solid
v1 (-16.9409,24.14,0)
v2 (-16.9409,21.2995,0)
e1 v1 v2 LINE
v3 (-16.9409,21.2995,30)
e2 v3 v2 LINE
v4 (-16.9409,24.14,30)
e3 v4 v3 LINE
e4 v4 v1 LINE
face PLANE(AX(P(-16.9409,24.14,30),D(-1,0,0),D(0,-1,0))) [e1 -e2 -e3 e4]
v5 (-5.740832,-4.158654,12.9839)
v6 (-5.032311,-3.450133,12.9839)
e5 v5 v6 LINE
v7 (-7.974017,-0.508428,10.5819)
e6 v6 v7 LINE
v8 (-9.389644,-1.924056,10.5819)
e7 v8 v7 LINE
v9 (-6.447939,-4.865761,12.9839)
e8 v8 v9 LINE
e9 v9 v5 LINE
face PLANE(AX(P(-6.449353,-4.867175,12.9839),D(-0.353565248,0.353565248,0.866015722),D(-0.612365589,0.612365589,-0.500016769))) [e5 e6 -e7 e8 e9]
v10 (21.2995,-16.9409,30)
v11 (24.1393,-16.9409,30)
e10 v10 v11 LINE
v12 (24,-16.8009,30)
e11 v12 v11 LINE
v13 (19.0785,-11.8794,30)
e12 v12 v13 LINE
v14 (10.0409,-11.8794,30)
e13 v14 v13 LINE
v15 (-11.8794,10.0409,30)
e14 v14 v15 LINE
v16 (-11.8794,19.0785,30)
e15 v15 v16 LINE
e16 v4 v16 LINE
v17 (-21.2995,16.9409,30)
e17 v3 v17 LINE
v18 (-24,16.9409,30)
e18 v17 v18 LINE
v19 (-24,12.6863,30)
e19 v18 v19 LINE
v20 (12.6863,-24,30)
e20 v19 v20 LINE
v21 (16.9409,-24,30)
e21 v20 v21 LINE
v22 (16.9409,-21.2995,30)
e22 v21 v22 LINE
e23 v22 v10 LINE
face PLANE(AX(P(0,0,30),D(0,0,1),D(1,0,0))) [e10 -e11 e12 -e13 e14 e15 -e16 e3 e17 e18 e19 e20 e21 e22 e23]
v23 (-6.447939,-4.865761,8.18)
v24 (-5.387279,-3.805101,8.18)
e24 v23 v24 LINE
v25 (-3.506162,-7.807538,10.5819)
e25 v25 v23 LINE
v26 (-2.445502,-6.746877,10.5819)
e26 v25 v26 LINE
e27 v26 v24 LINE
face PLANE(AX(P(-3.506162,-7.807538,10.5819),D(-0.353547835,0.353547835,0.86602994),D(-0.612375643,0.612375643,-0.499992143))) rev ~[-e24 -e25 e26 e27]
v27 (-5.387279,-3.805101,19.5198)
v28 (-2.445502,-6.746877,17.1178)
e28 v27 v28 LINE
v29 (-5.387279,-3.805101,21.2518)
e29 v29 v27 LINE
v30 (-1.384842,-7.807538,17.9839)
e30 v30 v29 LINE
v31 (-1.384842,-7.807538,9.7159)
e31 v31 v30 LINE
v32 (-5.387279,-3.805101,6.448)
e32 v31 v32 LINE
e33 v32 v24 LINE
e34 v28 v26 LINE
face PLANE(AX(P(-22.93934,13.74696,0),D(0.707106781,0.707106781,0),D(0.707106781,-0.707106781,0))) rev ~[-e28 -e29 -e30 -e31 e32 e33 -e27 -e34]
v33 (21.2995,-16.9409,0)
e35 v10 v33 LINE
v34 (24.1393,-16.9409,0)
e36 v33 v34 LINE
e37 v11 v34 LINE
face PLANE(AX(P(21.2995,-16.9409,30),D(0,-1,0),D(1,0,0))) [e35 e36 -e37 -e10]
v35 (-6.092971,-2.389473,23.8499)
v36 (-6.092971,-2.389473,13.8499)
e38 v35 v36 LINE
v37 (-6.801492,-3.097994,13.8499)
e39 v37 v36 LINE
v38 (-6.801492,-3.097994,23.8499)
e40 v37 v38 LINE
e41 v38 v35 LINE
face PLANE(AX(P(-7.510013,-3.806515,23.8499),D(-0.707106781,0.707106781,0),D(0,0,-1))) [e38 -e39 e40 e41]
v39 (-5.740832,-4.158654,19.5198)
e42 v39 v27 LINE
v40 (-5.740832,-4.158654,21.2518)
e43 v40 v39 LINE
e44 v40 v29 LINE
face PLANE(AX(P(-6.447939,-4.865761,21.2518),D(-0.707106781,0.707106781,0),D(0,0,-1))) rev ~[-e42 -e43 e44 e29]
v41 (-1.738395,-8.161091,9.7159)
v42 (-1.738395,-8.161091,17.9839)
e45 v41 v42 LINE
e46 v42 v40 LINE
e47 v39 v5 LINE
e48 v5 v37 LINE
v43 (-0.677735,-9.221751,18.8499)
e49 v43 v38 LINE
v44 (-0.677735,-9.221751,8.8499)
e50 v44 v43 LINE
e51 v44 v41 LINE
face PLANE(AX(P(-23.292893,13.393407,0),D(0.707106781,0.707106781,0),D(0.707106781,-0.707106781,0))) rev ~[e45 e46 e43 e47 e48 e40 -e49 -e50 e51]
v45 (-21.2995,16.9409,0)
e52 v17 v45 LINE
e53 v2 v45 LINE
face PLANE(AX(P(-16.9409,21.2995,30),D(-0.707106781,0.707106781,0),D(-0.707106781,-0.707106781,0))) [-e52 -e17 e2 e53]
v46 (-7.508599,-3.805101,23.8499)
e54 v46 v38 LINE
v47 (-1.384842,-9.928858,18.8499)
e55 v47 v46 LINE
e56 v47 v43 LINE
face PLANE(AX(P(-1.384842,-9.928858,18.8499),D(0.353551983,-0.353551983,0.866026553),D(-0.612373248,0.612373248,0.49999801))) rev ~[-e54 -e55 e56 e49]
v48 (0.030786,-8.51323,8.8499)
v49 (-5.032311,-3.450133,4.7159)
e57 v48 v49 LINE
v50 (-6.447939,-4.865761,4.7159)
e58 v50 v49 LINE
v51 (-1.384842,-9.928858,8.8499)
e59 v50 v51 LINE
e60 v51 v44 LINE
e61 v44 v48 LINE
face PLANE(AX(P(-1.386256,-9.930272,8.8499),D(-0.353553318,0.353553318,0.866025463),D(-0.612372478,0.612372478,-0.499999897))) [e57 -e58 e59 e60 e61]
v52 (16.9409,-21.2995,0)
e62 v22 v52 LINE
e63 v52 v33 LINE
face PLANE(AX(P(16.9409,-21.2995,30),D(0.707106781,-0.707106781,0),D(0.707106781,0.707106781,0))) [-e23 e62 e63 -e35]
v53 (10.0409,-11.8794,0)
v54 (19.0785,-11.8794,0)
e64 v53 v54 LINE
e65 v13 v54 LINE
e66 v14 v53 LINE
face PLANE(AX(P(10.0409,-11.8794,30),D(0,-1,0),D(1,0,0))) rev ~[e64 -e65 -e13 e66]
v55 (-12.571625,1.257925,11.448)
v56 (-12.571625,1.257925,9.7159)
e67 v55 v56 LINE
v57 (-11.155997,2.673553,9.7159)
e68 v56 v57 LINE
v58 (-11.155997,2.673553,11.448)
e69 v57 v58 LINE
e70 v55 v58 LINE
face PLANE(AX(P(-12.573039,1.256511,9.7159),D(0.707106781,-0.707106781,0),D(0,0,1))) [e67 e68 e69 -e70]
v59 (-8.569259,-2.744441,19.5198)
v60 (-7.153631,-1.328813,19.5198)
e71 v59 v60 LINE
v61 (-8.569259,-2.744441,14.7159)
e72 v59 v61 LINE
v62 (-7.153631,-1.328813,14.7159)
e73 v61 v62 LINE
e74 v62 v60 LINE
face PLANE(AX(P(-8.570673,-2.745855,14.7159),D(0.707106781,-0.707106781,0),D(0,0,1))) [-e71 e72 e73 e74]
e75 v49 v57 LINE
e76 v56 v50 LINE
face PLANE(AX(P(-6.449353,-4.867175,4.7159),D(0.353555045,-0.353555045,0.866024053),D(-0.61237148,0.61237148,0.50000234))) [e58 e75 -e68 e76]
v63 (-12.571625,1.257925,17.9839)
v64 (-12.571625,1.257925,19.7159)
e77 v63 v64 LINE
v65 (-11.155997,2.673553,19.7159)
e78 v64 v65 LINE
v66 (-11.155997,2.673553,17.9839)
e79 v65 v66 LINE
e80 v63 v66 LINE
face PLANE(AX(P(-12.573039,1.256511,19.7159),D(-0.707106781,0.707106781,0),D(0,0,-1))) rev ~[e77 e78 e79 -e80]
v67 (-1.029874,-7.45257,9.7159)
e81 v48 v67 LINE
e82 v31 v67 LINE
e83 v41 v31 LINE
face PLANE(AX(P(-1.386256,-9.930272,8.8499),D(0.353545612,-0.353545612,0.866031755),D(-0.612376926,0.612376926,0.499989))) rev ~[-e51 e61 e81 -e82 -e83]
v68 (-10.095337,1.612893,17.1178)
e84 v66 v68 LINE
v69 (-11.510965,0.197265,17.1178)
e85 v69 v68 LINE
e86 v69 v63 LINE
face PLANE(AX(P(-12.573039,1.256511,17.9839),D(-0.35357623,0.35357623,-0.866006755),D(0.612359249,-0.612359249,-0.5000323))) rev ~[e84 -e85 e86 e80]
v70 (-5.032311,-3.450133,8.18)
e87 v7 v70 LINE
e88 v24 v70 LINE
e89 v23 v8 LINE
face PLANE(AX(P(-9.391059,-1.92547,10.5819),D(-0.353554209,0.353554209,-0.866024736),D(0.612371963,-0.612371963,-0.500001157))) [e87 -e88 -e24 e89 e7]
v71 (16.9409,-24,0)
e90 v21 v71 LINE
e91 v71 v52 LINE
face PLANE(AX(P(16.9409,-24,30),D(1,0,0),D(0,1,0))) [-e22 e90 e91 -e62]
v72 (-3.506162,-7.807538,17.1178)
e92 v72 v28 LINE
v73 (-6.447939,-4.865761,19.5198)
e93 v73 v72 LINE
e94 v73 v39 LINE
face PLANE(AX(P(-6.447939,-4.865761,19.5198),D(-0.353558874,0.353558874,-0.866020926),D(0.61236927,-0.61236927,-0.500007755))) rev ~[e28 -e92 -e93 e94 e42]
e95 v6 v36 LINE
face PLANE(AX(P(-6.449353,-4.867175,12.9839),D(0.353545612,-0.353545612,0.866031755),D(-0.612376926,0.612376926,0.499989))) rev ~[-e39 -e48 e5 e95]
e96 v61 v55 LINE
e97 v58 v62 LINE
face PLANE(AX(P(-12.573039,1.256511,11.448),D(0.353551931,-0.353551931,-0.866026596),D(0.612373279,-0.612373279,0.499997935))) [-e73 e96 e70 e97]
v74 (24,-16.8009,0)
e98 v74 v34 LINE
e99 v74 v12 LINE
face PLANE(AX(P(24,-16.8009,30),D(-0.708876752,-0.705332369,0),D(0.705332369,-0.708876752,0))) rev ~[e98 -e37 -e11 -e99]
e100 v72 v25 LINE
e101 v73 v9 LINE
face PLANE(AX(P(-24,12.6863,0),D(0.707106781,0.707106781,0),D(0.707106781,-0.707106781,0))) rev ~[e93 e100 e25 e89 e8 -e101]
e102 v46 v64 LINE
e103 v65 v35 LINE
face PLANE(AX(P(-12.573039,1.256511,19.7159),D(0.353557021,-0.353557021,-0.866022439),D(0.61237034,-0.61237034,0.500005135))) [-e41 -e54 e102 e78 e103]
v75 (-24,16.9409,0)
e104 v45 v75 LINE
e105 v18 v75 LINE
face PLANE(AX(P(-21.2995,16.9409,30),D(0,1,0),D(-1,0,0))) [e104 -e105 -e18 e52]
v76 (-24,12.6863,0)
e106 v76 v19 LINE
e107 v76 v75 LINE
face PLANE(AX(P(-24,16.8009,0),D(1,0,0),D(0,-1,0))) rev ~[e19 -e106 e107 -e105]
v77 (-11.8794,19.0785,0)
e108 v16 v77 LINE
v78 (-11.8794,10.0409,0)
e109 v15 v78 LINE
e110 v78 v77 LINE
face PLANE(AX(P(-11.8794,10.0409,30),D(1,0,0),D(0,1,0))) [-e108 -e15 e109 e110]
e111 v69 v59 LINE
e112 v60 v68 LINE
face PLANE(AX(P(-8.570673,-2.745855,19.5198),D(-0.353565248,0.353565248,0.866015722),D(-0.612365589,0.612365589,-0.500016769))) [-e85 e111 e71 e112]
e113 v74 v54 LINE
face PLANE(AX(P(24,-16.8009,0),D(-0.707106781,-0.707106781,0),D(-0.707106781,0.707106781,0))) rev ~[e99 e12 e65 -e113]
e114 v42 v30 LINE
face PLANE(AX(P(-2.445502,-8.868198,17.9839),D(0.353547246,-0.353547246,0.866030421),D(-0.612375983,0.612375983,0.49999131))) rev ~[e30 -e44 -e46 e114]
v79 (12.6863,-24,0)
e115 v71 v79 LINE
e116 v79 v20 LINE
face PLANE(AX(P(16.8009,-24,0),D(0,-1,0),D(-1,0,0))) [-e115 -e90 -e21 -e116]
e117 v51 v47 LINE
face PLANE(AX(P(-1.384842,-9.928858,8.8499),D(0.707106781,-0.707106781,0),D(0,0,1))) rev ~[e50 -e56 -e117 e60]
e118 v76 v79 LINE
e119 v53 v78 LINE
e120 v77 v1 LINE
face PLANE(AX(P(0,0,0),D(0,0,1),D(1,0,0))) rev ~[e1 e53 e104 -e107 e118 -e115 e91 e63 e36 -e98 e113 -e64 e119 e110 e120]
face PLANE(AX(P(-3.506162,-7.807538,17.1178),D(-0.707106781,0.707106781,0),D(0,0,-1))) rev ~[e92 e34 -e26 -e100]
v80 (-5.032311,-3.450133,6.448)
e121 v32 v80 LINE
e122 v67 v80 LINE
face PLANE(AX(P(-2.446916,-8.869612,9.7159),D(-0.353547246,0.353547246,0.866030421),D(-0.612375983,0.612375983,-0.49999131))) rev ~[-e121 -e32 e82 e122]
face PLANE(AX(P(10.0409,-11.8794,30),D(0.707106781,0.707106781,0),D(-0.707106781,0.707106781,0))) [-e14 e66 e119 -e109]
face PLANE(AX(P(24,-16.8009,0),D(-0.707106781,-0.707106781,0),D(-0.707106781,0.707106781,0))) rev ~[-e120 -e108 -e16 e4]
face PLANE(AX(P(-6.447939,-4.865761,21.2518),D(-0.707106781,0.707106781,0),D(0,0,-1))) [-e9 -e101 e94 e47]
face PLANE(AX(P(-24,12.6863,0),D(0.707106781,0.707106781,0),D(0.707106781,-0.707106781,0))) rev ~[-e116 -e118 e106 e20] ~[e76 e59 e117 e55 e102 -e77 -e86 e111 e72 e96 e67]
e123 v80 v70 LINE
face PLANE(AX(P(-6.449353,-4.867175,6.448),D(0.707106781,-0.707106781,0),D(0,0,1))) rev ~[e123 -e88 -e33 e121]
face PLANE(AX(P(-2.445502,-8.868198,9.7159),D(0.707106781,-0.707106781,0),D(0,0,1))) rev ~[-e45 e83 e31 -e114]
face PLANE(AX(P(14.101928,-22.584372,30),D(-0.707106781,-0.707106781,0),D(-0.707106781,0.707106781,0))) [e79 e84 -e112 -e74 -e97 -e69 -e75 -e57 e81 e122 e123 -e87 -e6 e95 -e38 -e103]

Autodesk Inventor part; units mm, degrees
ref_plane "YZ Plane" through (0, 0, 0) normal (1, 0, 0) x (0, 1, 0)
ref_plane "XZ Plane" through (0, 0, 0) normal (0, 1, 0) x (-1, 0, 0)
ref_plane "XY Plane" through (0, 0, 0) normal (0, 0, 1) x (1, 0, 0)
sketch "Sketch1" plane through (0, 0, 0) normal (0, 0, 1) x (1, 0, 0)
  line L0 (-16.8009, 21.2415) -> (21.2415, -16.8009)
  line L1 (21.2415, -16.8009) -> (16.8009, -21.2415)
  line L2 (16.8009, -21.2415) -> (-21.2415, 16.8009)
  line L3 (-21.2415, 16.8009) -> (-16.8009, 21.2415)
  line L4 (-16.8009, 21.2415) -> (16.8009, -21.2415) construction
  line L5 (21.2415, -16.8009) -> (-21.2415, 16.8009) construction
  line L6 (-16.8009, 21.2415) -> (36.9991, 21.2415) construction
  line L7 (-21.2415, 16.8009) -> (-24, 16.8009)
  line L8 (16.8009, -21.2415) -> (16.8009, -24)
  line L9 (16.8009, -24) -> (-24, 16.8009)
  line L10 (-16.8009, 21.2415) -> (-16.8009, 24)
  line L11 (21.2415, -16.8009) -> (24, -16.8009)
  line L12 (24, -16.8009) -> (-16.8009, 24)
  line L13 (-24, 16.8009) -> (-24, 12.6863)
  line L14 (16.8009, -24) -> (12.6863, -24)
  line L15 (-24, 12.6863) -> (12.6863, -24)
  line L16 (-24, 16.8009) -> (-11.8721, 28.9288) construction
  line L17 (-24, 16.8009) -> (-6.8486, 16.8009) construction
  point P0 (0, 0)
  dimension "d0" = 53.8
  dimension "d1" = 45
  dimension "d2" = 6.28
  dimension "d5" = 8
  dimension "d72" = 24
  dimension "d73" = 45
extrude "Extrusion1" add sketch "Sketch1" along normal blind 30
ref_plane "Work Plane1" through (16.9, -16.9, -8) normal (-0.7071068, -0.7071068, 0) x (0, 0, 1)
sketch "Sketch7" plane through (0, 0, 30) normal (0, 0, 1) x (1, 0, 0)
  line L0 (21.2415, -16.8009) -> (24, -16.8009) projected
  line L1 (24, -16.8009) -> (-16.8009, 24) projected
  line L2 (-16.8009, 24) -> (-16.8009, 21.2415) projected
  line L3 (-16.8009, 21.2415) -> (-21.2415, 16.8009) projected
  line L4 (-21.2415, 16.8009) -> (-24, 16.8009) projected
  line L5 (-24, 16.8009) -> (-24, 12.6863) projected
  line L6 (-24, 12.6863) -> (12.6863, -24) projected
  line L7 (12.6863, -24) -> (16.8009, -24) projected
  line L8 (16.8009, -24) -> (16.8009, -21.2415) projected
  line L9 (16.8009, -21.2415) -> (21.2415, -16.8009) projected
  line L10 (3.5996, 3.5996) -> (-5.6569, -5.6569)
  line L11 (-24, 12.6863) -> (12.6863, -24) projected
  line L12 (19.0785, -2.8418) -> (10.0409, -11.8794)
  line L13 (10.0409, -11.8794) -> (-11.8794, 10.0409)
  line L14 (-11.8794, 10.0409) -> (-2.8418, 19.0785)
  line L15 (-2.8418, 19.0785) -> (19.0785, -2.8418)
  line L16 (19.0785, -2.8418) -> (-11.8794, 10.0409) construction
  line L17 (10.0409, -11.8794) -> (-2.8418, 19.0785) construction
  line L18 (-11.8794, 10.0409) -> (-11.8794, 19.0785)
  line L19 (24, -16.8009) -> (-16.8009, 24) projected
  line L20 (10.0409, -11.8794) -> (19.0785, -11.8794)
  point P0 (0, 0)
  dimension "d28" = 31
  dimension "d29" = 1.3
  dimension "d74" = 0
extrude "Extrusion7" cut sketch "Sketch7" against normal through all contours L20 L12 L1 | L12 L13 L10 L1 | L1 L14 L15 L12 | L10 L13 L14 L1 | L14 L18 L1
sketch "Sketch10" plane through (12.6863, -24, 30) normal (-0.7071068, -0.7071068, 0) x (-0.7071068, 0.7071068, 0)
  line L0 (1.6838, 16.5215) -> (7.0744, 19.4702) construction
  line L1 (7.0744, 19.4702) -> (7.0744, 10.5304) construction
  line L2 (7.0744, 10.5304) -> (1.6838, 10.5304) construction
  line L3 (1.6838, 10.5304) -> (1.6838, 6.839) construction
  line L4 (1.6838, 6.839) -> (6.7206, 6.839) construction
  line L5 (6.7206, 6.839) -> (6.7206, 1.2092) construction
  line L6 (6.7206, 1.2092) -> (1.6838, 1.2092) construction
  line L7 (1.6838, 1.2092) -> (1.6838, -3.423) construction
  line L8 (1.6838, -3.423) -> (55.1934, -3.423) construction
  line L9 (1.6838, 30.377) -> (1.6838, 26.2152) construction
  line L10 (1.6838, 26.2152) -> (7.1181, 26.2152) construction
  line L11 (7.1181, 26.2152) -> (7.1181, 20.0634) construction
  line L12 (7.1181, 20.0634) -> (1.6838, 20.0634) construction
  line L13 (1.6838, 20.0634) -> (1.6838, 16.5215) construction
  line L14 (7.0744, 15.0003) -> (55.1934, 14.9149) construction
  line L15 (1.6838, 30.377) -> (36.6838, 30.377) construction
  line L16 (36.6838, -3.423) -> (1.6838, -3.423) construction
  line L17 (19.8996, 21.1501) -> (19.8996, 11.1501)
  line L18 (19.8996, 11.1501) -> (28.5599, 6.1501)
  line L19 (19.8996, 21.1501) -> (21.3996, 20.2841)
  line L20 (21.3996, 20.2841) -> (21.3996, 12.0161)
  line L21 (21.3996, 12.0161) -> (27.0599, 8.7482)
  line L22 (27.0599, 8.7482) -> (27.0599, 17.0161)
  line L23 (27.0599, 17.0161) -> (28.5599, 16.1501)
  line L24 (28.5599, 16.1501) -> (28.5599, 6.1501)
  line L25 (51.8823, 0) -> (0, 0) construction
  line L26 (51.8823, 30) -> (51.8823, 0) construction
  line L27 (51.8823, 15) -> (0, 15) construction
  line L28 (0, 30) -> (0, 0) construction
  point P0 (25.9411, 30)
  point P1 (25.9411, 15)
  dimension "d40" = 1.5
  dimension "d41" = 1.5
  dimension "d42" = 1.5
  dimension "d43" = 10
  dimension "d44" = 10
  dimension "d75" = 8.268
  dimension "d76" = 120
emboss "Emboss1" sketch "Sketch10" operation cut depth 1 direction (0.7071068, 0.7071068, 0)
sketch "Sketch11" plane through (12.6863, -24, 30) normal (-0.7071068, -0.7071068, 0) x (-0.7071068, 0.7071068, 0)
  line L0 (21.3996, 12.0161) -> (27.0599, 8.7482) construction
  line L1 (27.0599, 8.7482) -> (27.0599, 17.0161) construction
  line L2 (27.0599, 17.0161) -> (28.5599, 16.1501) construction
  line L3 (28.5599, 16.1501) -> (28.5599, 6.1501) construction
  line L4 (28.5599, 6.1501) -> (19.8996, 11.1501) construction
  line L5 (19.8996, 11.1501) -> (19.8996, 21.1501) construction
  line L6 (19.8996, 21.1501) -> (21.3996, 20.2841) construction
  line L7 (21.3996, 20.2841) -> (21.3996, 12.0161) construction
  line L8 (0, 30) -> (51.8823, 30) construction
  line L9 (0, 30) -> (0, 0) construction
  line L10 (51.8823, 0) -> (0, 0) construction
  line L11 (51.8823, 30) -> (51.8823, 0) construction
  line L12 (9.2379, 27.3057) -> (21.3996, 20.2841) construction
  line L13 (21.3996, 20.2841) -> (21.3996, 12.0161) construction
  line L14 (21.3996, 12.0161) -> (27.0599, 8.7482) construction
  line L15 (27.0599, 8.7482) -> (27.0599, 7.4216) construction
  line L16 (27.0599, 7.4216) -> (17.8982, 13.0177) construction
  line L17 (17.8982, 13.0177) -> (17.8982, 3.0177) construction
  line L18 (17.8982, 3.0177) -> (9.2379, 8.0177) construction
  line L19 (9.2379, 8.0177) -> (9.2379, 27.3057) construction
  line L20 (15.5651, 18.4016) -> (15.5, -16.9) construction
  line L21 (15.5651, 18.4016) -> (-17.5, 16.9) construction
  line L22 (-17.5, 16.9) -> (-17.5, 12.7382) construction
  line L23 (-17.5, 12.7382) -> (-12.0658, 12.7382) construction
  line L24 (-12.0658, 12.7382) -> (-12.0658, 6.5864) construction
  line L25 (-12.0658, 6.5864) -> (-17.5, 6.5864) construction
  line L26 (-17.5, 6.5864) -> (-17.5, 3.0446) construction
  line L27 (-17.5, 3.0446) -> (-12.1095, 3.0446) construction
  line L28 (-12.1095, 3.0446) -> (-12.1095, -2.9465) construction
  line L29 (-12.1095, -2.9465) -> (-17.5, -2.9465) construction
  line L30 (-17.5, -2.9465) -> (-17.5, -6.638) construction
  line L31 (-17.5, -6.638) -> (-12.4632, -6.638) construction
  line L32 (-12.4632, -6.638) -> (-12.4632, -12.2678) construction
  line L33 (-12.4632, -12.2678) -> (-17.5, -12.2678) construction
  line L34 (-17.5, -12.2678) -> (-17.5, -16.9) construction
  line L35 (-17.5, -16.9) -> (15.5, -16.9) construction
  line L36 (-12.1095, 0.049) -> (15.5326, 0.7508) construction
  line L37 (15.5, -16.9) -> (15.5651, 18.4016) construction
  line L38 (1.91, 17.7815) -> (1.91, -16.9) construction
  line L39 (15.5, -16.9) -> (-17.5, -16.9) construction
  line L40 (27.0599, 8.7482) -> (27.0599, 7.4216) construction
  line L41 (21.3996, 20.2841) -> (21.3996, 12.0161)
  line L42 (21.3996, 12.0161) -> (27.0599, 8.7482)
  line L43 (21.3996, 20.2841) -> (21.3996, 12.0161)
  line L44 (21.3996, 12.0161) -> (27.0599, 8.7482)
  line L45 (27.0599, 8.7482) -> (27.0599, 10.4802)
  line L46 (27.0599, 8.7482) -> (27.0599, 7.4216)
  line L47 (27.0599, 10.4802) -> (22.8996, 12.8822)
  line L48 (22.8996, 12.8822) -> (22.8996, 19.4181)
  line L49 (22.8996, 19.4181) -> (27.0599, 21.82)
  line L50 (21.3996, 20.2841) -> (27.0599, 23.552)
  line L51 (27.0599, 23.552) -> (27.0599, 21.82)
  point P0 (25.9411, 30)
  point P1 (20.9754, 14.9785)
  dimension "d47" = 120
  dimension "d48" = 1.5
  dimension "d49" = 1.5
  dimension "d50" = 1.5
  dimension "d77" = 8.268
  dimension "d78" = 4.1602
  dimension "d79" = 5.6602
  dimension "d80" = 120
  dimension "d81" = 120
emboss "Emboss2" sketch "Sketch11" operation cut depth 1.5 direction (0.7071068, 0.7071068, 0)
sketch "Sketch12" plane through (12.6863, -24, 30) normal (-0.7071068, -0.7071068, 0) x (-0.7071068, 0.7071068, 0)
  line L0 (22.8996, 12.8822) -> (27.0599, 10.4802) construction
  line L1 (27.0599, 10.4802) -> (27.0599, 17.0161) construction
  line L2 (27.0599, 17.0161) -> (28.5599, 16.1501) construction
  line L3 (28.5599, 16.1501) -> (28.5599, 6.1501) construction
  line L4 (28.5599, 6.1501) -> (19.8996, 11.1501) construction
  line L5 (19.8996, 11.1501) -> (19.8996, 21.1501) construction
  line L6 (19.8996, 21.1501) -> (21.3996, 20.2841) construction
  line L7 (21.3996, 20.2841) -> (27.0599, 23.552) construction
  line L8 (27.0599, 23.552) -> (27.0599, 21.82) construction
  line L9 (27.0599, 21.82) -> (22.8996, 19.4181) construction
  line L10 (22.8996, 19.4181) -> (22.8996, 12.8822) construction
  line L11 (0, 30) -> (51.8823, 30) construction
  line L12 (0, 30) -> (0, 0) construction
  line L13 (51.8823, 0) -> (0, 0) construction
  line L14 (51.8823, 30) -> (51.8823, 0) construction
  line L15 (12.7689, 9.4432) -> (16.9291, 7.0413) construction
  line L16 (16.9291, 7.0413) -> (27.0599, 17.0161) construction
  line L17 (27.0599, 17.0161) -> (28.5599, 16.1501) construction
  line L18 (28.5599, 16.1501) -> (28.5599, 6.1501) construction
  line L19 (28.5599, 6.1501) -> (13.0911, 5.9826) construction
  line L20 (13.0911, 5.9826) -> (19.8996, 21.1501) construction
  line L21 (19.8996, 21.1501) -> (21.3996, 20.2841) construction
  line L22 (21.3996, 20.2841) -> (27.0599, 23.552) construction
  line L23 (27.0599, 23.552) -> (27.0599, 21.82) construction
  line L24 (27.0599, 21.82) -> (12.7689, 15.9791) construction
  line L25 (12.7689, 15.9791) -> (12.7689, 9.4432) construction
  line L26 (-17.5, 16.9) -> (-17.5, 12.7382) construction
  line L27 (-17.5, 12.7382) -> (-12.0658, 12.7382) construction
  line L28 (-12.0658, 12.7382) -> (-12.0658, 6.5864) construction
  line L29 (-12.0658, 6.5864) -> (-17.5, 6.5864) construction
  line L30 (-17.5, 6.5864) -> (-17.5, 3.0446) construction
  line L31 (-17.5, 3.0446) -> (-12.1095, 3.0446) construction
  line L32 (-12.1095, 3.0446) -> (-12.1095, -2.9465) construction
  line L33 (-12.1095, -2.9465) -> (-17.5, -2.9465) construction
  line L34 (-17.5, -2.9465) -> (-17.5, -6.638) construction
  line L35 (-17.5, -6.638) -> (-12.4632, -6.638) construction
  line L36 (-12.4632, -6.638) -> (-12.4632, -12.2678) construction
  line L37 (-12.4632, -12.2678) -> (-17.5, -12.2678) construction
  line L38 (-17.5, -12.2678) -> (-17.5, -16.9) construction
  line L39 (-17.5, -16.9) -> (15.5, -16.9) construction
  line L40 (21.3996, 20.2841) -> (27.0599, 23.552)
  line L41 (19.8996, 21.1501) -> (21.3996, 20.2841)
  line L42 (21.3996, 20.2841) -> (27.0599, 23.552)
  line L43 (27.0599, 23.552) -> (27.0599, 21.82)
  line L44 (27.0599, 23.552) -> (27.0599, 21.82)
  line L45 (16.9291, 7.0413) -> (27.0599, 17.0161) construction
  line L46 (19.8996, 21.1501) -> (27.0599, 25.2841)
  line L47 (27.0599, 25.2841) -> (35.7201, 20.2841)
  line L48 (35.7201, 20.2841) -> (35.7201, 18.552)
  line L49 (35.7201, 18.552) -> (30.0599, 15.2841)
  line L50 (30.0599, 15.2841) -> (30.0599, 10.4802)
  line L51 (30.0599, 10.4802) -> (34.2201, 12.8822)
  line L52 (35.7201, 10.2841) -> (35.7201, 10.2841)
  line L53 (35.7201, 10.2841) -> (28.5599, 6.1501)
  line L54 (27.0599, 17.0161) -> (28.5599, 16.1501)
  line L55 (28.5599, 6.1501) -> (28.5599, 16.1501)
  line L56 (28.5599, 16.1501) -> (27.0599, 17.0161)
  line L57 (27.0599, 21.82) -> (27.0599, 23.552)
  line L58 (28.5599, 16.1501) -> (28.5599, 6.1501)
  line L59 (27.0599, 17.0161) -> (31.2201, 19.4181)
  line L60 (31.2201, 19.4181) -> (27.0599, 21.82)
  line L61 (13.0911, 5.9826) -> (28.5599, 6.1501) construction
  line L62 (12.7689, 9.4432) -> (16.9291, 7.0413) construction
  line L63 (12.7689, 9.4432) -> (28.5599, 9.6142) construction
  line L64 (28.5599, 9.6142) -> (29.486, 10.1489) construction
  line L65 (28.5599, 16.1501) -> (35.7201, 20.2841) construction
  line L66 (28.5599, 6.1501) -> (34.2971, 9.4625) construction
  line L67 (31.2201, 19.4181) -> (35.3769, 18.7502) construction
  line L68 (27.0599, 23.552) -> (27.0599, 21.82) construction
  line L69 (35.3769, 18.7502) -> (27.0599, 23.552) construction
  line L70 (35.7201, 10.2841) -> (35.7201, 12.0161)
  line L71 (35.7201, 12.0161) -> (34.2201, 12.8822)
  line L72 (16.3223, 7.4494) -> (20.4826, 5.0475) construction
  line L73 (16.3223, 13.9853) -> (16.3223, 7.4494) construction
  line L74 (20.4826, 16.3872) -> (16.3223, 13.9853) construction
  line L75 (20.4826, 18.1193) -> (20.4826, 16.3872) construction
  line L76 (14.8223, 14.8513) -> (20.4826, 18.1193) construction
  line L77 (14.8223, 15.7065) -> (14.8223, 14.8513) construction
  line L78 (20.4826, 12.5307) -> (14.8223, 15.7065) construction
  line L79 (20.4826, 5.0475) -> (20.4826, 12.5307) construction
  line L80 (20.4826, 12.5307) -> (28.5599, 7.9987) construction
  line L81 (28.5599, 7.9987) -> (33.93, 11.0117) construction
  point P0 (25.9411, 30)
  point P1 (20.9754, 14.9785)
  dimension "d54" = 60
  dimension "d55" = 1.5
  dimension "d57" = 120
  dimension "d58" = 1.5
  dimension "d59" = 120
  dimension "d82" = 3
  dimension "d83" = 3
  dimension "d84" = 3
  dimension "d85" = 1.5
  dimension "d86" = 7.1602
  dimension "d87" = 7.1602
  dimension "d88" = 4.1602
  dimension "d89" = 1.7321
  dimension "d90" = 5.6602
  dimension "d91" = 1.7321
  dimension "d92" = 4.1602
extrude "Extrusion9" cut sketch "Sketch12" against normal blind 2
sketch "Sketch13" plane through (0, 0, 30) normal (0, 0, 1) x (1, 0, 0)
  line L0 (-11.8794, 19.0785) -> (-16.8009, 24) construction
  line L1 (-16.8009, 24) -> (-16.8009, 21.2415) projected
  line L2 (-16.8009, 21.2415) -> (-21.2415, 16.8009) projected
  line L3 (-21.2415, 16.8009) -> (-24, 16.8009) projected
  line L4 (-24, 16.8009) -> (-24, 12.6863) construction
  line L5 (-24, 12.6863) -> (12.6863, -24) construction
  line L6 (12.6863, -24) -> (16.8009, -24) construction
  line L7 (16.8009, -24) -> (16.8009, -21.2415) projected
  line L8 (16.8009, -21.2415) -> (21.2415, -16.8009) projected
  line L9 (21.2415, -16.8009) -> (24, -16.8009) projected
  line L10 (24.1, -24.6971) -> (24.1, -16.7029) construction
  line L11 (24.1, -16.7029) -> (-16.9409, 24.338) construction
  line L12 (-16.9409, 24.338) -> (-16.9409, 21.2995)
  line L13 (-16.9409, 21.2995) -> (-21.2995, 16.9409)
  line L14 (-21.2995, 16.9409) -> (-24.14, 16.9409)
  line L15 (-24.14, 16.9409) -> (-24.14, 12.6283) construction
  line L16 (-24.14, 12.6283) -> (12.6283, -24.14) construction
  line L17 (12.6283, -24.14) -> (16.9409, -24.14) construction
  line L18 (16.9409, -24.14) -> (16.9409, -21.2995)
  line L19 (16.9409, -21.2995) -> (21.2995, -16.9409)
  line L20 (21.2995, -16.9409) -> (24.2814, -16.9409)
  line L21 (24.2814, -16.9409) -> (53.8994, -46.5588) construction
  line L22 (53.8994, -46.5588) -> (45.9617, -46.5588) construction
  line L23 (45.9617, -46.5588) -> (24.1, -24.6971) construction
  line L24 (16.8009, -24) -> (16.9409, -24)
  line L25 (24, -16.8009) -> (24.1393, -16.9409)
  line L26 (-21.2415, 16.8009) -> (-22.9, 16.8009) projected
  line L27 (19.0785, -11.8794) -> (10.0409, -11.8794) projected
  line L28 (10.0409, -11.8794) -> (-11.8794, 10.0409) projected
  line L29 (-11.8794, 10.0409) -> (-11.8794, 19.0785) projected
  line L30 (24, -16.8009) -> (19.0785, -11.8794) projected
  line L31 (-24, 12.6863) -> (-24, 16.8009) projected
  line L32 (-24, 16.8009) -> (-24, 16.9409)
  line L33 (-16.8009, 24) -> (-16.9409, 24.14)
  point P0 (0, 0)
  point P1 (-22.9, 16.9409)
  dimension "d93" = 0.14
extrude "IM_offset" add sketch "Sketch13" against normal up to surface (30 mm away)
equation "\"d3\" = MirrorThickness1"
equation "\"d41\" = d40"
equation "\"d42\" = d40"
equation "\"d44\" = d43"
equation "\"d48\" = d51"
equation "\"d49\" = d51"
equation "\"d50\" = d51"
equation "\"d55\" = d60"
equation "\"d58\" = d60"
equation "\"MirrorThickness1\" = 30"
equation "\"d51\" = 1.5"
equation "\"d60\" = 1.5"
properties part number "20_Cube_Insert_Mirror_Holder_wLogo_v3"
